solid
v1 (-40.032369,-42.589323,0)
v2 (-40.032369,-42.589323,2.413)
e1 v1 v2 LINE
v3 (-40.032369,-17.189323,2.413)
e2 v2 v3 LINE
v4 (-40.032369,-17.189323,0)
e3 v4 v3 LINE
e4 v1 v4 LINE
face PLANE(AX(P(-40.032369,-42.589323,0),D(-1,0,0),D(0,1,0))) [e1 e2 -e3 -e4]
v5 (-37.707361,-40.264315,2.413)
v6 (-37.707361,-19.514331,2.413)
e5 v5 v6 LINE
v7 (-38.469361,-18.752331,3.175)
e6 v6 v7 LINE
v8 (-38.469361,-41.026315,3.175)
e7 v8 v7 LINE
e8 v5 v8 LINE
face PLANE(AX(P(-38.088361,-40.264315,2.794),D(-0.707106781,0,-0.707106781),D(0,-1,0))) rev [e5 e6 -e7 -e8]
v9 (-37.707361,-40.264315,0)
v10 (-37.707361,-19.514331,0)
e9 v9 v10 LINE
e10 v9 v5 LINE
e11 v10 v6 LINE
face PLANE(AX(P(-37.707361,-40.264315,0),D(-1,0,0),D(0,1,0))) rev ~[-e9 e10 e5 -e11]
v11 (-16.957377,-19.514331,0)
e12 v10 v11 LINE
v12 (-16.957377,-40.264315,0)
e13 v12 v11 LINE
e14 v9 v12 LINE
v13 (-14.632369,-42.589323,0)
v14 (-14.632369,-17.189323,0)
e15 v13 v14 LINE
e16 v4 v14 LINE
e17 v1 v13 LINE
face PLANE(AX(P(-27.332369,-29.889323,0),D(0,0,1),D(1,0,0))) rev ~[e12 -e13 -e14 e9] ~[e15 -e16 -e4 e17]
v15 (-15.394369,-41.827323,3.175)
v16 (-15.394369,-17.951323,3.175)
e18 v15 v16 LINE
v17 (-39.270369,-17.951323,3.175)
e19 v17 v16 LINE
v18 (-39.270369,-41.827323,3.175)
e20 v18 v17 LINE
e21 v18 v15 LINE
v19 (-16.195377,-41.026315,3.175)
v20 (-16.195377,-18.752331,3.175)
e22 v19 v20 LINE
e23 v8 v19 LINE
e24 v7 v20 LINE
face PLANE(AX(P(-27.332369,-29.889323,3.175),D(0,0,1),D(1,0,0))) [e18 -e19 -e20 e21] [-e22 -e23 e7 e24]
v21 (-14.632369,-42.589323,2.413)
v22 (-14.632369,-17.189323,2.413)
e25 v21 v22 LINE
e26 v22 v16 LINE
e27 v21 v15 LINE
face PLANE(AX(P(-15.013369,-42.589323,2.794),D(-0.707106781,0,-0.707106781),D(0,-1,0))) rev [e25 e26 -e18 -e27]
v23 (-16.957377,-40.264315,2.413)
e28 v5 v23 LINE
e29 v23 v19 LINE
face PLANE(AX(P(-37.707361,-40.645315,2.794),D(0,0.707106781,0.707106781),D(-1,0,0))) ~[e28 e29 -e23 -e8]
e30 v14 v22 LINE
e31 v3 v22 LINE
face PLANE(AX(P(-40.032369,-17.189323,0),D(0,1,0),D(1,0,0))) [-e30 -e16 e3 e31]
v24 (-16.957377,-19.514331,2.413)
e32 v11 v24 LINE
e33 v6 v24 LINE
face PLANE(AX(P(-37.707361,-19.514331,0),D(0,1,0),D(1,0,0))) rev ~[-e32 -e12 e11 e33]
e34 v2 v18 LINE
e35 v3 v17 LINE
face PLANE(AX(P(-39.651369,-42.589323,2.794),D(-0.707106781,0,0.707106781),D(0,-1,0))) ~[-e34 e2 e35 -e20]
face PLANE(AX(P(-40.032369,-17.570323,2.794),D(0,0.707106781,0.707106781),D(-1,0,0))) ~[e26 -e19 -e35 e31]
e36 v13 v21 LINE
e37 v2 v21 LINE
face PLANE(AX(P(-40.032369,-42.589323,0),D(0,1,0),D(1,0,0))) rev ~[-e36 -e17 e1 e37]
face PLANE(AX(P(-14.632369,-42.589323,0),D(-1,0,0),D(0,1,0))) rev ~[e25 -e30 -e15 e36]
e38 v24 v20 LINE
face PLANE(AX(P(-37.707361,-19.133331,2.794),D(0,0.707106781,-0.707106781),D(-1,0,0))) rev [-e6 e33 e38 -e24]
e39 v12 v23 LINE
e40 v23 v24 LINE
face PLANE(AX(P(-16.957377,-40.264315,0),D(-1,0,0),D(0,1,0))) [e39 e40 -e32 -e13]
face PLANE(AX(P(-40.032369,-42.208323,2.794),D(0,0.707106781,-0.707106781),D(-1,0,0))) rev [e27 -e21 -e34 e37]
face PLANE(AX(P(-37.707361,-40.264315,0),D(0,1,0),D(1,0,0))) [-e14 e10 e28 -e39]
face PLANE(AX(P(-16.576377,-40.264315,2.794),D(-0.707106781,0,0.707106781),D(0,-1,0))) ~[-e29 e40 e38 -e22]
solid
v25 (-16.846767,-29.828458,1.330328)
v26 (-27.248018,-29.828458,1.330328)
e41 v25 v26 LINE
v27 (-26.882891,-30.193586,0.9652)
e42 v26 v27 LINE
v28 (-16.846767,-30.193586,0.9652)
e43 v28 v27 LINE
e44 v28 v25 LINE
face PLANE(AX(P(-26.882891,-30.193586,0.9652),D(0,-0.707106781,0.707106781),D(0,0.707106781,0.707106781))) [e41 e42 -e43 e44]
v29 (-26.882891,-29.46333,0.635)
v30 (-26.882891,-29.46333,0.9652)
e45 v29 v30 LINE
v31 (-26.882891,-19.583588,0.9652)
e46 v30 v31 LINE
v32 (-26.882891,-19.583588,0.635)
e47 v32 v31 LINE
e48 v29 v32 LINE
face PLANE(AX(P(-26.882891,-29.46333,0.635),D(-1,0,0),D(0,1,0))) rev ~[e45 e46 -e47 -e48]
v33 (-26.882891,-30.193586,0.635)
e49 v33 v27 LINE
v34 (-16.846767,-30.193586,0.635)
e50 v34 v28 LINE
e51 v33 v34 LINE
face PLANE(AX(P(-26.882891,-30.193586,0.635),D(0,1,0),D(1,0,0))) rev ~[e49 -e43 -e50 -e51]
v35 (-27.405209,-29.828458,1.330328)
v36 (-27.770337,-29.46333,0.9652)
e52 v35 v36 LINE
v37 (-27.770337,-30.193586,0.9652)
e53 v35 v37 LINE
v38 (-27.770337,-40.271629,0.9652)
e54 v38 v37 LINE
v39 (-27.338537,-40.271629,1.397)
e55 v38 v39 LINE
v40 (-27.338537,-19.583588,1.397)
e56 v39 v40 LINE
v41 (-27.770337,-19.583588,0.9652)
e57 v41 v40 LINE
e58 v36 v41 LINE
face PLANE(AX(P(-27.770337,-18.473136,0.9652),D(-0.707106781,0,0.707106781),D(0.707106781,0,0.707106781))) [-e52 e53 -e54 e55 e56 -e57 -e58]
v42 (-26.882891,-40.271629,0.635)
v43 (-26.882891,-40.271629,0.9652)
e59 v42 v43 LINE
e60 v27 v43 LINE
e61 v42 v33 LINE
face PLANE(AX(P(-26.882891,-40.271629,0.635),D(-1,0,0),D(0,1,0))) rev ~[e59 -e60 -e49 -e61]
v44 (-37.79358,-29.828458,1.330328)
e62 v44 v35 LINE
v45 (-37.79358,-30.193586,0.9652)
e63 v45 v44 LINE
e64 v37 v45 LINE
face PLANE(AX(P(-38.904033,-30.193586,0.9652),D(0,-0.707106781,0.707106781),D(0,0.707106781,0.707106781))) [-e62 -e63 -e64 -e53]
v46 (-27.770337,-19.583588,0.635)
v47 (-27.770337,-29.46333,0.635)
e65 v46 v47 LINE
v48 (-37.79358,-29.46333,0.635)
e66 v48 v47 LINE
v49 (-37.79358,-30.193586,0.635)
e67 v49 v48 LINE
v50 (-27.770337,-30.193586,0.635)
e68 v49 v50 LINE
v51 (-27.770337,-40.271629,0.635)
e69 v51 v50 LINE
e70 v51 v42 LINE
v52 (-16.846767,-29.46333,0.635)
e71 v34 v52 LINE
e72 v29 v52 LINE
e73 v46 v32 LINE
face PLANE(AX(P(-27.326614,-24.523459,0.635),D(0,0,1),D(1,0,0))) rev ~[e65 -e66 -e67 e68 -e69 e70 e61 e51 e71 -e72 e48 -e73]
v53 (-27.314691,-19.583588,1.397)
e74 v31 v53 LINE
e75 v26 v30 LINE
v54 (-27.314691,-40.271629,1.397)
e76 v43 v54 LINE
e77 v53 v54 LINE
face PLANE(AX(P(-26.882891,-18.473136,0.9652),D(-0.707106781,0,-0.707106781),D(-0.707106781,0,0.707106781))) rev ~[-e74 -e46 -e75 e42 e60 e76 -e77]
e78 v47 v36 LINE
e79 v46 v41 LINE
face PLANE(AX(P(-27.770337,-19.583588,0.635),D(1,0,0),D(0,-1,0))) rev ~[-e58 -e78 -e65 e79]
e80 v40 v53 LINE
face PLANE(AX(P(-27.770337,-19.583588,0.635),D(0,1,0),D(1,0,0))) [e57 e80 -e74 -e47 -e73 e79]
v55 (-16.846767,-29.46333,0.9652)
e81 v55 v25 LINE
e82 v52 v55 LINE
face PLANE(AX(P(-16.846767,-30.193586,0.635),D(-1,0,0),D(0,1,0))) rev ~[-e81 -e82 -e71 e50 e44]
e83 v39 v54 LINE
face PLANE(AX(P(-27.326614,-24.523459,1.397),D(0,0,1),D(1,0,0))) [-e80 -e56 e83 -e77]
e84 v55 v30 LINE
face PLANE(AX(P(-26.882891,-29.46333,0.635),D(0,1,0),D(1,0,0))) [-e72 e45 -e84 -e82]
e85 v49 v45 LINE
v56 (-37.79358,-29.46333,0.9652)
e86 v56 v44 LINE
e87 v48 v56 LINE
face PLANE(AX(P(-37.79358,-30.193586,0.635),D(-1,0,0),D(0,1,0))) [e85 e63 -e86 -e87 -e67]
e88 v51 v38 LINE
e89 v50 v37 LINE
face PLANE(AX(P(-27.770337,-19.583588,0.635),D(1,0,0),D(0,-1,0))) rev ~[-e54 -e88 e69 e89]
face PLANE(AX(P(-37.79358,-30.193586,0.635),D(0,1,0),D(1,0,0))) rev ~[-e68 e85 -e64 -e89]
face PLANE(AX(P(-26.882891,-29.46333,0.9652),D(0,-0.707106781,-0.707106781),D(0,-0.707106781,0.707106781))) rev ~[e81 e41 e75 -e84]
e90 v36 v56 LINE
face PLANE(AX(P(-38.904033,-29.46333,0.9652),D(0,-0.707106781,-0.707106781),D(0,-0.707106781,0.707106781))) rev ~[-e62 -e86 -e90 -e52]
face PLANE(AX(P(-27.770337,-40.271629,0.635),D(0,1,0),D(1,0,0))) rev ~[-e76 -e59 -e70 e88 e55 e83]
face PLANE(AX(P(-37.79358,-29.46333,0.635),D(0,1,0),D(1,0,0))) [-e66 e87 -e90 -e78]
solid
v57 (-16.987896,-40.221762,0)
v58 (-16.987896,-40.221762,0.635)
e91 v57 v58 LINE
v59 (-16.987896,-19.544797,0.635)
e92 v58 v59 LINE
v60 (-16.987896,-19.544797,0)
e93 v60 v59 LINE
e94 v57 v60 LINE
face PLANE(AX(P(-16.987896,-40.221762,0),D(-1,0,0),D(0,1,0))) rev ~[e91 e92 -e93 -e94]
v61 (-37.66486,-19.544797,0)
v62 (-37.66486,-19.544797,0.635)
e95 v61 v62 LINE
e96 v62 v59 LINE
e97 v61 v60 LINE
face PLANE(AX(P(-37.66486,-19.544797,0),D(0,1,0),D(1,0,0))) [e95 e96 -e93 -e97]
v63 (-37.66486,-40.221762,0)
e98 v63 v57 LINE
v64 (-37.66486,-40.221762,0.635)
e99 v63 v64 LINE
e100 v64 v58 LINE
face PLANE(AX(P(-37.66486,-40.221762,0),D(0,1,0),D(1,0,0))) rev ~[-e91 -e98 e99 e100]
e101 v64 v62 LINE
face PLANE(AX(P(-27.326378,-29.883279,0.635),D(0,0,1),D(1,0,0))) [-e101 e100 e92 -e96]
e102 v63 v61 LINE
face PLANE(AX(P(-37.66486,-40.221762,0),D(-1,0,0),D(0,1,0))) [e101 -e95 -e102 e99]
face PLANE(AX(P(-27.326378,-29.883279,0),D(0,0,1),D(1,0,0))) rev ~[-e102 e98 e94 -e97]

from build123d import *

# Parameters (mm, degrees)
F0_W         = 25.4
F0_H         = 25.4
F0_W_2       = 20.7499843091
F0_H_2       = 20.7499843091
F1_DEPTH     = 3.175
F2_W         = 20.6769648939
F2_H         = 20.6769648939
F3_DEPTH     = 0.635
F5_W         = 0.8874461055
F5_H         = 9.8797418177
F5_H_2       = 0.7302556187
F5_W_2       = 10.0232437253
F5_W_3       = 10.0361239165
F5_H_3       = 10.0780427456
F6_DEPTH     = 0.762
F7_T1_DEPTH  = 11.1336964395
F7_T3_DEPTH  = 10.9901945319
F7_T5_DEPTH  = 11.1465766307
F7_T7_DEPTH  = 11.1884954598
F7_T12_DEPTH = 12.2441491537
F7_T17_DEPTH = 12.2441491537
F7_T22_DEPTH = 12.1006472461
F7_T27_DEPTH = 12.1006472461
F7_T32_DEPTH = 12.2570293449
F7_T37_DEPTH = 12.2570293449
F7_T42_DEPTH = 12.298948174
F7_T47_DEPTH = 12.298948174
F7_T53_DEPTH = 12.2441491537
F7_T58_DEPTH = 12.298948174
F7_T66_DEPTH = 12.1006472461
F7_T71_DEPTH = 12.2441491537
F7_T79_DEPTH = 12.2570293449
F7_T84_DEPTH = 12.1006472461
F7_T92_DEPTH = 12.298948174
F7_T97_DEPTH = 12.2570293449
F8_SIZE      = 0.762


# Not quite as in the source:
# - a fillet or chamfer that OpenCascade refuses, or shapes differently, is made with other operations: its cross-section is extruded or revolved along the edge and cut away or added


with BuildPart() as f1:
    # F0 (on Top) → F1 (new body)
    with BuildSketch(Plane.XY):
        with Locations((-27.3323692381, -29.8893228173)):
            Rectangle(F0_W, F0_H)
        with Locations((-27.3323692381, -29.8893228173)):
            Rectangle(F0_W_2, F0_H_2, mode=Mode.SUBTRACT)
    extrude(amount=F1_DEPTH)

    # F8
    f8_edges = [f1.edges().sort_by_distance(p)[0] for p in [
        (-14.632369, -29.889323, 3.175),
        (-27.332369, -42.589323, 3.175),
        (-40.032369, -29.889323, 3.175),
        (-27.332369, -17.189323, 3.175),
        (-37.707361, -29.889323, 3.175),
        (-27.332369, -19.514331, 3.175),
        (-16.957377, -29.889323, 3.175),
        (-27.332369, -40.264315, 3.175),
    ]]
    chamfer(f8_edges, length=F8_SIZE)


with BuildPart() as f3:
    # F2 (on Top) → F3 (new body)
    with BuildSketch(Plane.XY):
        with Locations((-27.32637804, -29.8832794651)):
            Rectangle(F2_W, F2_H)
    extrude(amount=F3_DEPTH)


with BuildPart() as f6:
    # F5 (on face) → F6 (new body)
    with BuildSketch(Plane.XY.offset(0.635)):
        with Locations((-27.3266136646, -24.5234593749)):
            Rectangle(F5_W, F5_H)
        with Locations((-27.3266136646, -29.8284580931)):
            Rectangle(F5_W, F5_H_2)
        with Locations((-32.78195858, -29.8284580931)):
            Rectangle(F5_W_2, F5_H_2)
        with Locations((-21.8648286536, -29.8284580931)):
            Rectangle(F5_W_3, F5_H_2)
        with Locations((-27.3266136646, -35.2326072752)):
            Rectangle(F5_W, F5_H_3)
    extrude(amount=F6_DEPTH)

    # F7: chamfer of 0.4318 on 8 edges, made by hand

    # F7_s2 → F7_t1 (cut)
    with BuildSketch(Plane.YZ.offset(-38.9040331569)):
        Polygon((-30.1935859025, 0.9652), (-29.7617859025, 1.397), (-30.1935859025, 1.397), align=None)
        Polygon((-29.4633302838, 0.9652), (-29.8951302838, 1.397), (-29.4633302838, 1.397), align=None)
    extrude(amount=F7_T1_DEPTH, mode=Mode.SUBTRACT)

    # F7_s4 → F7_t3 (cut)
    with BuildSketch(Plane.XZ.offset(18.4731357518)):
        Polygon((-27.7703367174, 0.9652), (-27.3385367174, 1.397), (-27.7703367174, 1.397), align=None)
        Polygon((-26.8828906119, 0.9652), (-27.3146906119, 1.397), (-26.8828906119, 1.397), align=None)
    extrude(amount=F7_T3_DEPTH, mode=Mode.SUBTRACT)

    # F7_s6 → F7_t5 (cut)
    with BuildSketch(Plane.YZ.offset(-26.8828906119)):
        Polygon((-29.4633302838, 0.9652), (-29.8951302838, 1.397), (-29.4633302838, 1.397), align=None)
        Polygon((-30.1935859025, 0.9652), (-29.7617859025, 1.397), (-30.1935859025, 1.397), align=None)
    extrude(amount=F7_T5_DEPTH, mode=Mode.SUBTRACT)

    # F7_s8 → F7_t7 (cut)
    with BuildSketch(Plane.XZ.offset(30.1935859025)):
        Polygon((-26.8828906119, 0.9652), (-27.3146906119, 1.397), (-26.8828906119, 1.397), align=None)
        Polygon((-27.7703367174, 0.9652), (-27.3385367174, 1.397), (-27.7703367174, 1.397), align=None)
    extrude(amount=F7_T7_DEPTH, mode=Mode.SUBTRACT)


with BuildPart() as f7_tool10:
    # F7_s11 → F7_t12 (new body)
    with BuildSketch(Plane.YZ.offset(-38.9040331569)):
        Polygon((-30.1935859025, 0.9652), (-29.7617859025, 1.397), (-30.1935859025, 1.397), align=None)
    extrude(amount=F7_T12_DEPTH)

    split(bisect_by=Plane.YZ.offset(-26.8828906119), keep=Keep.TOP)


with BuildPart() as f6_1:
    add(f6.part)

    # F7_t9: cut F7_tool10
    add(f7_tool10.part, mode=Mode.SUBTRACT)


with BuildPart() as f7_tool15:
    # F7_s16 → F7_t17 (new body)
    with BuildSketch(Plane.YZ.offset(-26.6598840032)):
        Polygon((-29.4633302838, 0.9652), (-29.8951302838, 1.397), (-29.4633302838, 1.397), align=None)
    extrude(amount=-F7_T17_DEPTH)

    split(bisect_by=Plane.YZ.offset(-26.8828906119), keep=Keep.TOP)


with BuildPart() as f6_2:
    add(f6_1.part)

    # F7_t14: cut F7_tool15
    add(f7_tool15.part, mode=Mode.SUBTRACT)


with BuildPart() as f7_tool20:
    # F7_s21 → F7_t22 (new body)
    with BuildSketch(Plane.XZ.offset(18.4731357518)):
        Polygon((-27.7703367174, 0.9652), (-27.3385367174, 1.397), (-27.7703367174, 1.397), align=None)
    extrude(amount=F7_T22_DEPTH)

    split(bisect_by=Plane.XZ.offset(30.1935859025), keep=Keep.TOP)


with BuildPart() as f6_3:
    add(f6_2.part)

    # F7_t19: cut F7_tool20
    add(f7_tool20.part, mode=Mode.SUBTRACT)


with BuildPart() as f7_tool25:
    # F7_s26 → F7_t27 (new body)
    with BuildSketch(Plane.XZ.offset(30.573782998)):
        Polygon((-26.8828906119, 0.9652), (-27.3146906119, 1.397), (-26.8828906119, 1.397), align=None)
    extrude(amount=-F7_T27_DEPTH)

    split(bisect_by=Plane.XZ.offset(30.1935859025), keep=Keep.TOP)


with BuildPart() as f6_4:
    add(f6_3.part)

    # F7_t24: cut F7_tool25
    add(f7_tool25.part, mode=Mode.SUBTRACT)


with BuildPart() as f7_tool30:
    # F7_s31 → F7_t32 (new body)
    with BuildSketch(Plane.YZ.offset(-15.7363139812)):
        Polygon((-29.4633302838, 0.9652), (-29.8951302838, 1.397), (-29.4633302838, 1.397), align=None)
    extrude(amount=-F7_T32_DEPTH)

    split(bisect_by=Plane.YZ.offset(-27.7703367174), keep=Keep.BOTTOM)


with BuildPart() as f6_5:
    add(f6_4.part)

    # F7_t29: cut F7_tool30
    add(f7_tool30.part, mode=Mode.SUBTRACT)


with BuildPart() as f7_tool35:
    # F7_s36 → F7_t37 (new body)
    with BuildSketch(Plane.YZ.offset(-27.9933433261)):
        Polygon((-30.1935859025, 0.9652), (-29.7617859025, 1.397), (-30.1935859025, 1.397), align=None)
    extrude(amount=F7_T37_DEPTH)

    split(bisect_by=Plane.YZ.offset(-27.7703367174), keep=Keep.BOTTOM)


with BuildPart() as f6_6:
    add(f6_5.part)

    # F7_t34: cut F7_tool35
    add(f7_tool35.part, mode=Mode.SUBTRACT)


with BuildPart() as f7_tool40:
    # F7_s41 → F7_t42 (new body)
    with BuildSketch(Plane.XZ.offset(41.3820813622)):
        Polygon((-26.8828906119, 0.9652), (-27.3146906119, 1.397), (-26.8828906119, 1.397), align=None)
    extrude(amount=-F7_T42_DEPTH)

    split(bisect_by=Plane.XZ.offset(29.4633302838), keep=Keep.BOTTOM)


with BuildPart() as f6_7:
    add(f6_6.part)

    # F7_t39: cut F7_tool40
    add(f7_tool40.part, mode=Mode.SUBTRACT)


with BuildPart() as f7_tool45:
    # F7_s46 → F7_t47 (new body)
    with BuildSketch(Plane.XZ.offset(29.0831331882)):
        Polygon((-27.7703367174, 0.9652), (-27.3385367174, 1.397), (-27.7703367174, 1.397), align=None)
    extrude(amount=F7_T47_DEPTH)

    split(bisect_by=Plane.XZ.offset(29.4633302838), keep=Keep.BOTTOM)


with BuildPart() as f6_8:
    add(f6_7.part)

    # F7_t44: cut F7_tool45
    add(f7_tool45.part, mode=Mode.SUBTRACT)


with BuildPart() as f7_tool51:
    # F7_s52 → F7_t53 (new body)
    with BuildSketch(Plane.YZ.offset(-38.9040331569)):
        Polygon((-30.1935859025, 0.9652), (-29.7617859025, 1.397), (-30.1935859025, 1.397), align=None)
    extrude(amount=F7_T53_DEPTH)

    split(bisect_by=Plane.YZ.offset(-27.7703367174), keep=Keep.TOP)

    split(bisect_by=Plane.YZ.offset(-26.8828906119), keep=Keep.BOTTOM)


with BuildPart() as f7_tool56:
    # F7_s57 → F7_t58 (new body)
    with BuildSketch(Plane.XZ.offset(29.0831331882)):
        Polygon((-27.7703367174, 0.9652), (-27.3385367174, 1.397), (-27.7703367174, 1.397), align=None)
    extrude(amount=F7_T58_DEPTH)

    split(bisect_by=Plane.XZ.offset(29.4633302838), keep=Keep.TOP)

    split(bisect_by=Plane.XZ.offset(30.1935859025), keep=Keep.BOTTOM)


with BuildPart() as f7_tool51_1:
    add(f7_tool51.part)

    # F7_t61: intersect F7_tool56
    add(f7_tool56.part, mode=Mode.INTERSECT)


with BuildPart() as f6_9:
    add(f6_8.part)

    # F7_t49: cut F7_tool51
    add(f7_tool51_1.part, mode=Mode.SUBTRACT)


with BuildPart() as f7_tool64:
    # F7_s65 → F7_t66 (new body)
    with BuildSketch(Plane.XZ.offset(18.4731357518)):
        Polygon((-27.7703367174, 0.9652), (-27.3385367174, 1.397), (-27.7703367174, 1.397), align=None)
    extrude(amount=F7_T66_DEPTH)

    split(bisect_by=Plane.XZ.offset(29.4633302838), keep=Keep.TOP)

    split(bisect_by=Plane.XZ.offset(30.1935859025), keep=Keep.BOTTOM)


with BuildPart() as f7_tool69:
    # F7_s70 → F7_t71 (new body)
    with BuildSketch(Plane.YZ.offset(-26.6598840032)):
        Polygon((-29.4633302838, 0.9652), (-29.8951302838, 1.397), (-29.4633302838, 1.397), align=None)
    extrude(amount=-F7_T71_DEPTH)

    split(bisect_by=Plane.YZ.offset(-27.7703367174), keep=Keep.TOP)

    split(bisect_by=Plane.YZ.offset(-26.8828906119), keep=Keep.BOTTOM)


with BuildPart() as f7_tool64_1:
    add(f7_tool64.part)

    # F7_t74: intersect F7_tool69
    add(f7_tool69.part, mode=Mode.INTERSECT)


with BuildPart() as f6_10:
    add(f6_9.part)

    # F7_t62: cut F7_tool64
    add(f7_tool64_1.part, mode=Mode.SUBTRACT)


with BuildPart() as f7_tool77:
    # F7_s78 → F7_t79 (new body)
    with BuildSketch(Plane.YZ.offset(-15.7363139812)):
        Polygon((-29.4633302838, 0.9652), (-29.8951302838, 1.397), (-29.4633302838, 1.397), align=None)
    extrude(amount=-F7_T79_DEPTH)

    split(bisect_by=Plane.YZ.offset(-27.7703367174), keep=Keep.TOP)

    split(bisect_by=Plane.YZ.offset(-26.8828906119), keep=Keep.BOTTOM)


with BuildPart() as f7_tool82:
    # F7_s83 → F7_t84 (new body)
    with BuildSketch(Plane.XZ.offset(30.573782998)):
        Polygon((-26.8828906119, 0.9652), (-27.3146906119, 1.397), (-26.8828906119, 1.397), align=None)
    extrude(amount=-F7_T84_DEPTH)

    split(bisect_by=Plane.XZ.offset(30.1935859025), keep=Keep.BOTTOM)

    split(bisect_by=Plane.XZ.offset(29.4633302838), keep=Keep.TOP)


with BuildPart() as f7_tool77_1:
    add(f7_tool77.part)

    # F7_t87: intersect F7_tool82
    add(f7_tool82.part, mode=Mode.INTERSECT)


with BuildPart() as f6_11:
    add(f6_10.part)

    # F7_t75: cut F7_tool77
    add(f7_tool77_1.part, mode=Mode.SUBTRACT)


with BuildPart() as f7_tool90:
    # F7_s91 → F7_t92 (new body)
    with BuildSketch(Plane.XZ.offset(41.3820813622)):
        Polygon((-26.8828906119, 0.9652), (-27.3146906119, 1.397), (-26.8828906119, 1.397), align=None)
    extrude(amount=-F7_T92_DEPTH)

    split(bisect_by=Plane.XZ.offset(30.1935859025), keep=Keep.BOTTOM)

    split(bisect_by=Plane.XZ.offset(29.4633302838), keep=Keep.TOP)


with BuildPart() as f7_tool95:
    # F7_s96 → F7_t97 (new body)
    with BuildSketch(Plane.YZ.offset(-27.9933433261)):
        Polygon((-30.1935859025, 0.9652), (-29.7617859025, 1.397), (-30.1935859025, 1.397), align=None)
    extrude(amount=F7_T97_DEPTH)

    split(bisect_by=Plane.YZ.offset(-27.7703367174), keep=Keep.TOP)

    split(bisect_by=Plane.YZ.offset(-26.8828906119), keep=Keep.BOTTOM)


with BuildPart() as f7_tool90_1:
    add(f7_tool90.part)

    # F7_t100: intersect F7_tool95
    add(f7_tool95.part, mode=Mode.INTERSECT)


with BuildPart() as f6_12:
    add(f6_11.part)

    # F7_t88: cut F7_tool90
    add(f7_tool90_1.part, mode=Mode.SUBTRACT)


solid = Compound([f1.part, f3.part, f6_12.part])
